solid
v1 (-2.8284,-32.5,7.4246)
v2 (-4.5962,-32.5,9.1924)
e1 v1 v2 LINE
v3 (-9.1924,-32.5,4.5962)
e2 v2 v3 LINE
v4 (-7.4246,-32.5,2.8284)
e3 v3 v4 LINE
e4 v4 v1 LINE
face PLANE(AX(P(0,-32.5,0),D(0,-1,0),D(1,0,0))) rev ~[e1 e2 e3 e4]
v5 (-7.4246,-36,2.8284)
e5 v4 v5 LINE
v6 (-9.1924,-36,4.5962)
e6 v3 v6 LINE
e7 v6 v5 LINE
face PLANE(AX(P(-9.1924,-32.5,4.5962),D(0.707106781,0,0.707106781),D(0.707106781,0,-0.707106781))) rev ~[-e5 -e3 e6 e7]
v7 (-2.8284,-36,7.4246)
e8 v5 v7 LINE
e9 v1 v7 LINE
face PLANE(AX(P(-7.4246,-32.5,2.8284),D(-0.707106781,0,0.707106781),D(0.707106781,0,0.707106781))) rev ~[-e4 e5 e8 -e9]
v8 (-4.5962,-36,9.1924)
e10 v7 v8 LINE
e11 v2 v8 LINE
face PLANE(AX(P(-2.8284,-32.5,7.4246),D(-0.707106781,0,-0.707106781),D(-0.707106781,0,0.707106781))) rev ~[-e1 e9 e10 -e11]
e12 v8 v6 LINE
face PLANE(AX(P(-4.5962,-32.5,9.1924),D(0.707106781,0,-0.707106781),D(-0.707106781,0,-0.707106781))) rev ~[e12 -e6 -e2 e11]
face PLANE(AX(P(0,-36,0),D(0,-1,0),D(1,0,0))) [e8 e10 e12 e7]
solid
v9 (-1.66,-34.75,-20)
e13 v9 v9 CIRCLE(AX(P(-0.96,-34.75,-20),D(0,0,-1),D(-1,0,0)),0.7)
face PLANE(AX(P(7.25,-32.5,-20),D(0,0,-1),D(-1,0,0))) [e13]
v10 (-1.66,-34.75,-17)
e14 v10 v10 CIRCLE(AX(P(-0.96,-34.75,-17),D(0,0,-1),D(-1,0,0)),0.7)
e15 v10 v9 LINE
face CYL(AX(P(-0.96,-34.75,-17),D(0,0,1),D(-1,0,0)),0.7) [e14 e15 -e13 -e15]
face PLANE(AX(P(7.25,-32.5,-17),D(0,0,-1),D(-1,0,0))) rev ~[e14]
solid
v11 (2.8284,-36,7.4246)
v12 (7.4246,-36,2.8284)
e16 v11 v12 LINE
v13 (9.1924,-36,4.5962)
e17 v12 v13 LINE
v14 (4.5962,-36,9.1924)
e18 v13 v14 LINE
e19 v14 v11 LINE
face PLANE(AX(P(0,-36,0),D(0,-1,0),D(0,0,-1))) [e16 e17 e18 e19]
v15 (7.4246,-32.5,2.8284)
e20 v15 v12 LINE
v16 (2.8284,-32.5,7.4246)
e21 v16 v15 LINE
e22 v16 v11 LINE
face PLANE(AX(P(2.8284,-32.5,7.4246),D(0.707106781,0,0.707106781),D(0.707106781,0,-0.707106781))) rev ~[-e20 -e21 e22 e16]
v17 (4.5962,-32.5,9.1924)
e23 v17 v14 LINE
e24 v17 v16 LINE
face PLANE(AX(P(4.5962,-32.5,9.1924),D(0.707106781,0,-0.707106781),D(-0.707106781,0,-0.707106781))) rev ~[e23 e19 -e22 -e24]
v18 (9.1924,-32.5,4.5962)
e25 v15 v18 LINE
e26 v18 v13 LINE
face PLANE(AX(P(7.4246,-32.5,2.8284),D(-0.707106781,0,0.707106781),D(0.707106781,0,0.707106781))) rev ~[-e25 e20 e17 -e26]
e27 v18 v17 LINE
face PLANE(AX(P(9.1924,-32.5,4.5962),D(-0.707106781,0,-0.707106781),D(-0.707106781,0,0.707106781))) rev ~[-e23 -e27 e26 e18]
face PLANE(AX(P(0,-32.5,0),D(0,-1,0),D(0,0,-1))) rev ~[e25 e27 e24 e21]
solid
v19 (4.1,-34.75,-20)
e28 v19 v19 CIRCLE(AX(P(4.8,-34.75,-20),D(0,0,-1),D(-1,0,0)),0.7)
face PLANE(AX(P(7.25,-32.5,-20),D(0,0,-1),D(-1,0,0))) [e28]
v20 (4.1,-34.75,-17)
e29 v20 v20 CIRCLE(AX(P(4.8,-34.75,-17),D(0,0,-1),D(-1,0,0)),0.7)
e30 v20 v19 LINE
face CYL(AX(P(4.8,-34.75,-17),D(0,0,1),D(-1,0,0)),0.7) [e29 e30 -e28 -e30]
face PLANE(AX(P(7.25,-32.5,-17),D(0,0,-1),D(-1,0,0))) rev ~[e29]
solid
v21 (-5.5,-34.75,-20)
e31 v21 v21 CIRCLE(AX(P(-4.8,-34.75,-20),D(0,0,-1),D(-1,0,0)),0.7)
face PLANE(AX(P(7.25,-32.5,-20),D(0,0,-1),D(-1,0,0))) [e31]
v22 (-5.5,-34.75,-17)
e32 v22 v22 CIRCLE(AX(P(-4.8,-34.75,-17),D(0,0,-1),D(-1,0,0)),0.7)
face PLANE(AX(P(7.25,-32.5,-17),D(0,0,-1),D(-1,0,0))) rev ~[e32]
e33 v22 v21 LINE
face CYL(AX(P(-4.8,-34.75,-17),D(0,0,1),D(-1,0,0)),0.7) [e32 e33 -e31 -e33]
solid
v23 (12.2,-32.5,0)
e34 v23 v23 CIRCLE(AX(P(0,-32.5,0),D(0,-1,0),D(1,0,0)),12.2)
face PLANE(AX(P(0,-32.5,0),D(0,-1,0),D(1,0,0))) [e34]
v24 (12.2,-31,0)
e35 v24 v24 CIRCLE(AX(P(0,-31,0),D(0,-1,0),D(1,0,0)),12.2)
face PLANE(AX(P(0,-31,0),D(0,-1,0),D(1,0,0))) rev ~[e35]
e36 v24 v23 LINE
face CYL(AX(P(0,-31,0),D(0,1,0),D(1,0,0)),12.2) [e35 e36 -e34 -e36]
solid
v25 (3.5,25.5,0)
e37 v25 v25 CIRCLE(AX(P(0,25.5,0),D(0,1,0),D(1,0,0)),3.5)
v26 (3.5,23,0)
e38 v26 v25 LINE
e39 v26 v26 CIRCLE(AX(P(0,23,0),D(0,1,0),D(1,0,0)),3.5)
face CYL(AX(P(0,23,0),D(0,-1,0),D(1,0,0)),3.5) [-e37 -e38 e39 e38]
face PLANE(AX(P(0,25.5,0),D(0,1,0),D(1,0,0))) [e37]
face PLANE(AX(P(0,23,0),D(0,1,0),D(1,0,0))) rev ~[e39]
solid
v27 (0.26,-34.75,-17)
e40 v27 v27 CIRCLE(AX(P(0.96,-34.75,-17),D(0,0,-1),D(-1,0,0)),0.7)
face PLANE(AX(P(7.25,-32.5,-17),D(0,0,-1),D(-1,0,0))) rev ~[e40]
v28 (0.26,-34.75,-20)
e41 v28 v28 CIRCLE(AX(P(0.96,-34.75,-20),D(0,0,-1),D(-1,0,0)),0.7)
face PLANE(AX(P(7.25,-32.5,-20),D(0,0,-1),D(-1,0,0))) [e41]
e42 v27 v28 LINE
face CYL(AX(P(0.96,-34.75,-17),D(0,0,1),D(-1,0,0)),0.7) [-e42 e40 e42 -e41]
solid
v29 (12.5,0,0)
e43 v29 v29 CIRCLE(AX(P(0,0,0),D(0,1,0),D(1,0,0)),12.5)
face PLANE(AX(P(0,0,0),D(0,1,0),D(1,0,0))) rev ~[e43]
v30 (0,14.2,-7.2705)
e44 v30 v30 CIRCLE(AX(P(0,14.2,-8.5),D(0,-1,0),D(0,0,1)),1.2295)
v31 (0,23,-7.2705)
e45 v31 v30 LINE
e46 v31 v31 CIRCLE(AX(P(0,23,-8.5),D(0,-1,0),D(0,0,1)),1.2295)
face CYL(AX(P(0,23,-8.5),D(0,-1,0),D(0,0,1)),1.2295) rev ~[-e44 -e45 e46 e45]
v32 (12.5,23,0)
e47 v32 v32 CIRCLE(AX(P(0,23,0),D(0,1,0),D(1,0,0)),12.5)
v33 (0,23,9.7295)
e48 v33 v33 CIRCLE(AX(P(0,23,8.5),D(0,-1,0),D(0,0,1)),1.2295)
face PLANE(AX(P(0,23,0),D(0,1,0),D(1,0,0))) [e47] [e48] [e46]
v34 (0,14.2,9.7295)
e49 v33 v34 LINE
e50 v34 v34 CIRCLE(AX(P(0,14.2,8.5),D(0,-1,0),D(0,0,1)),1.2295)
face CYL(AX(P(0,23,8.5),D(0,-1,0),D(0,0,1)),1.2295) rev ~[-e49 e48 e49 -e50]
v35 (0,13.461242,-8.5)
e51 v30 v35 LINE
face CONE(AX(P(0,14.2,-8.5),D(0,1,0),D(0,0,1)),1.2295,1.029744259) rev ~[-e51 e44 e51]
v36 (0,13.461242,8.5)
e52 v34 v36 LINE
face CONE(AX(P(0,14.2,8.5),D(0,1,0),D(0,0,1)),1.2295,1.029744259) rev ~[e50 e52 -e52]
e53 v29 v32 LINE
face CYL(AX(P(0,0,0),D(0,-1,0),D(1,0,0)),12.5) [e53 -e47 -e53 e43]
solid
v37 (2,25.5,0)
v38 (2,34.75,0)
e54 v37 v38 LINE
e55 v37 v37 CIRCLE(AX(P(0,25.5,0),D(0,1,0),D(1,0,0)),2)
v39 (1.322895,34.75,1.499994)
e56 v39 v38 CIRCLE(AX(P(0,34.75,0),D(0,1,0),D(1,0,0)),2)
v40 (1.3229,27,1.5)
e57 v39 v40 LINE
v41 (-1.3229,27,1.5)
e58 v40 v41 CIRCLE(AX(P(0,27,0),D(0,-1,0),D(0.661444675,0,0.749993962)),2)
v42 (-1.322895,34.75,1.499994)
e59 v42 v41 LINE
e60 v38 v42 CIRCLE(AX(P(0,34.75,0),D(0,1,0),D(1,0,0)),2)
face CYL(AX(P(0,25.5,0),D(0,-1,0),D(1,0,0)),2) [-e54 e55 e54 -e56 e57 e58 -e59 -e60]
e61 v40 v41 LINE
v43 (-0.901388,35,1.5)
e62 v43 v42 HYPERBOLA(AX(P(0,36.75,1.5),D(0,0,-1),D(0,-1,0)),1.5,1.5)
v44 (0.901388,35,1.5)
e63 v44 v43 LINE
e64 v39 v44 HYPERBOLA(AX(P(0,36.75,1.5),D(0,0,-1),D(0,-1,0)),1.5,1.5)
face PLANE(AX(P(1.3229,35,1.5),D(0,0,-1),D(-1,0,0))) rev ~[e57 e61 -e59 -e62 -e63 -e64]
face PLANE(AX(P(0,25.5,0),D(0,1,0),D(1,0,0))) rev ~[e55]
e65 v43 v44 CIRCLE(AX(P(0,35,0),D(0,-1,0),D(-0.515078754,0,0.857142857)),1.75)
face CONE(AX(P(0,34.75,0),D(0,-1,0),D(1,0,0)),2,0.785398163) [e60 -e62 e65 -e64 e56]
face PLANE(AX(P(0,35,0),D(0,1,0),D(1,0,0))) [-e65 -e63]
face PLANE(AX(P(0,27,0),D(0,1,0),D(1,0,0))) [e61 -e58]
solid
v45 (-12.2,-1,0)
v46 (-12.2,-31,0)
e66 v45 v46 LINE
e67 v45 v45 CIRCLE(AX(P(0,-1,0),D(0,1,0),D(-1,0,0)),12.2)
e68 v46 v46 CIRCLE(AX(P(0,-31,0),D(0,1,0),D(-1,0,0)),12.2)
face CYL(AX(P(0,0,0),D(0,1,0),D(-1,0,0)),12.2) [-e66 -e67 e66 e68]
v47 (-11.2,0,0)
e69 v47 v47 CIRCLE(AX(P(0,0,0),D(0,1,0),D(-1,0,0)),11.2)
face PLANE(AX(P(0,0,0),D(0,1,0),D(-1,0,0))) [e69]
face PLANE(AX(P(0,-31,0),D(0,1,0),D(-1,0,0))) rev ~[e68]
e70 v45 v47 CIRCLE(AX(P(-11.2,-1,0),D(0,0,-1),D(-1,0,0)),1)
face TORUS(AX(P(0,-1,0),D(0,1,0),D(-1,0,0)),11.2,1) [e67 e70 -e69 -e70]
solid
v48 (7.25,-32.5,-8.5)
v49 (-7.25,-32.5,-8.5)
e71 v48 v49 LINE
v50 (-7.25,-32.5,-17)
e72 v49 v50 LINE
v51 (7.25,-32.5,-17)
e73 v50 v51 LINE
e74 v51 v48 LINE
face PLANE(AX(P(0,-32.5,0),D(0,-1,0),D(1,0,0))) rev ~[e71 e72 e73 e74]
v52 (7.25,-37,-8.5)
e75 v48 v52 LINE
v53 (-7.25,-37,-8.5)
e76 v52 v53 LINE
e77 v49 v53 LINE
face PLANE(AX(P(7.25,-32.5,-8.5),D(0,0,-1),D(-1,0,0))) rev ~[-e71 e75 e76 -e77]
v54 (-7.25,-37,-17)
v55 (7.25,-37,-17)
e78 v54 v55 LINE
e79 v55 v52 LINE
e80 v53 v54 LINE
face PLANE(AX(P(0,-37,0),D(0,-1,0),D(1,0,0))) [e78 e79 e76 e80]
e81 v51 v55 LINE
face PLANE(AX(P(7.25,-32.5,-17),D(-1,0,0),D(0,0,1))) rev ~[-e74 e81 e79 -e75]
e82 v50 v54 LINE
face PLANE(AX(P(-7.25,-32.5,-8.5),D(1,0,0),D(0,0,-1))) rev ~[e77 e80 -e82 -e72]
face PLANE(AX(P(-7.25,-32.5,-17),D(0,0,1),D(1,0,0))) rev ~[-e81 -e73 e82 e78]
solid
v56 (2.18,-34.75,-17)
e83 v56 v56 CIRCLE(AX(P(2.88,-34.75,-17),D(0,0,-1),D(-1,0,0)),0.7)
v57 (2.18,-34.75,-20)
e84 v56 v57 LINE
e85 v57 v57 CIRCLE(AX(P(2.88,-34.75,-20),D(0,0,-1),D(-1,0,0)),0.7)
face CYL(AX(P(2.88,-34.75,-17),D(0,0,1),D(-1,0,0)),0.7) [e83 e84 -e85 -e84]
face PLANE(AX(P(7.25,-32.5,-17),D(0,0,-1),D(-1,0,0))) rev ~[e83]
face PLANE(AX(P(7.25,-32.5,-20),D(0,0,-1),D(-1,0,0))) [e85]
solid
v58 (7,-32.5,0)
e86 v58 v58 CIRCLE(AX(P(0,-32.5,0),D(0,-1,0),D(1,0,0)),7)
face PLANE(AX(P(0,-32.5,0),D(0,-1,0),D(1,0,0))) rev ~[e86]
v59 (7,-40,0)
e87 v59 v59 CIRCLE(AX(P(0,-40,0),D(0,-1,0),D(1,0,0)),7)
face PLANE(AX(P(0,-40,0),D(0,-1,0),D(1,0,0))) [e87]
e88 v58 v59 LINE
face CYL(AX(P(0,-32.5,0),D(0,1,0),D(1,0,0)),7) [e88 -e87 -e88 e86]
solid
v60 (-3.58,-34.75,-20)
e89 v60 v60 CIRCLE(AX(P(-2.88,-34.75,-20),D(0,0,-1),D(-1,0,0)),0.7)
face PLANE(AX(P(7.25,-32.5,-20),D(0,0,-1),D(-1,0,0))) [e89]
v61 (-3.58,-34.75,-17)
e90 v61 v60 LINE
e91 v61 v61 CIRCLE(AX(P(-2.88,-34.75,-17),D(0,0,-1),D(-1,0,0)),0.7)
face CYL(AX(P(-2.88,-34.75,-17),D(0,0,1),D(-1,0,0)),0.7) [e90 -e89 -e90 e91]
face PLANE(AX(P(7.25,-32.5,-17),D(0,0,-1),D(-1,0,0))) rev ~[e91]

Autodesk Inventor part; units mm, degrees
ref_plane "YZ Plane" through (0, 0, 0) normal (1, 0, 0) x (0, 1, 0)
ref_plane "XZ Plane" through (0, 0, 0) normal (0, 1, 0) x (-1, 0, 0)
ref_plane "XY Plane" through (0, 0, 0) normal (0, 0, 1) x (1, 0, 0)
sketch "Sketch1" plane through (0, 0, 0) normal (0, 1, 0) x (-1, 0, 0)
  circle A0 centre (0, 0) radius 12.2
  dimension "d0" = 24.4
extrude "Extrusion1" add sketch "Sketch1" against normal blind 31
fillet "Fillet1" radius 1 1 edges at (12.2, 0, 0)
sketch "Sketch2" plane through (0, -31, 0) normal (0, -1, 0) x (1, 0, 0)
  circle A0 centre (0, 0) radius 12.2 projected
extrude "Extrusion2" add sketch "Sketch2" along normal blind 1.5 separate body
sketch "Sketch3" plane through (0, -32.5, 0) normal (0, -1, 0) x (1, 0, 0)
  circle A0 centre (0, 0) radius 7
  dimension "d6" = 14
extrude "Extrusion3" add sketch "Sketch3" along normal blind 7.5 separate body
sketch "Sketch4" plane through (0, -32.5, 0) normal (0, -1, 0) x (1, 0, 0)
  circle A0 centre (0, 0) radius 6.75 construction
  line L0 (-7.4246, 2.8284) -> (-2.8284, 7.4246)
  line L1 (-2.8284, 7.4246) -> (-4.5962, 9.1924)
  line L2 (-4.5962, 9.1924) -> (-9.1924, 4.5962)
  line L3 (-9.1924, 4.5962) -> (-7.4246, 2.8284)
  line L4 (-7.4246, 2.8284) -> (-4.5962, 9.1924) construction
  line L5 (-2.8284, 7.4246) -> (-9.1924, 4.5962) construction
  line L6 (0, 0) -> (-6.0104, 6.0104) construction
  line L7 (0, 0) -> (-12.2, 0) construction
  circle A1 centre (0, 0) radius 12.2 construction
  point P0 (4.773, -4.773)
  dimension "d9" = 13.5
  dimension "d10" = 6.5
  dimension "d11" = 2.5
  dimension "d12" = 45
  dimension "d13" = 16.5
extrude "Extrusion4" add sketch "Sketch4" along normal blind 3.5 separate body
pattern_circular "Circular Pattern1" count 2 over 90 about axis through (0, -32.5, 0) along (0, 1, 0) of "Extrusion4" bodies 4
sketch "Sketch5" plane through (0, -32.5, 0) normal (0, -1, 0) x (1, 0, 0)
  line L0 (-7.25, -17) -> (7.25, -17)
  line L1 (7.25, -17) -> (7.25, -8.5)
  line L2 (7.25, -8.5) -> (-7.25, -8.5)
  line L3 (-7.25, -8.5) -> (-7.25, -17)
  line L4 (-7.25, -17) -> (7.25, -8.5) construction
  line L5 (7.25, -17) -> (-7.25, -8.5) construction
  circle A0 centre (0, 0) radius 7 projected
  point P0 (0, -12.75)
  point P1 (0, -12.75)
  dimension "d19" = 17
  dimension "d20" = 8.5
  dimension "d21" = 14.5
extrude "Extrusion5" add sketch "Sketch5" along normal blind 4.5 separate body contours L3 L2 L1 L0
sketch "Sketch6" plane through (7.25, -32.5, -17) normal (0, 0, -1) x (-1, 0, 0)
  line L0 (12.05, -2.25) -> (10.13, -2.25) construction
  line L1 (10.13, -2.25) -> (8.21, -2.25) construction
  line L2 (8.21, -2.25) -> (6.29, -2.25) construction
  line L3 (6.29, -2.25) -> (4.37, -2.25) construction
  line L4 (4.37, -2.25) -> (2.45, -2.25) construction
  circle A0 centre (12.05, -2.25) radius 0.7
  circle A1 centre (10.13, -2.25) radius 0.7
  circle A2 centre (8.21, -2.25) radius 0.7
  circle A3 centre (6.29, -2.25) radius 0.7
  circle A4 centre (4.37, -2.25) radius 0.7
  circle A5 centre (2.45, -2.25) radius 0.7
  line L5 (14.5, 0) -> (14.5, -4.5) projected
  line L6 (14.5, -4.5) -> (0, -4.5) projected
  point P0 (7.25, 32.5)
  point P1 (14.5, -2.25)
  point P2 (7.25, -2.25)
  point P3 (7.25, -4.5)
  dimension "d24" = 9.6
  dimension "d25" = 1.4
extrude "Extrusion6" add sketch "Sketch6" along normal blind 3 separate body contours A0
extrude "Extrusion7" add sketch "Sketch6" along normal blind 3 separate body contours A1
extrude "Extrusion8" add sketch "Sketch6" along normal blind 3 separate body contours A2
extrude "Extrusion9" add sketch "Sketch6" along normal blind 3 separate body contours A3
extrude "Extrusion10" add sketch "Sketch6" along normal blind 3 separate body contours A4
extrude "Extrusion11" add sketch "Sketch6" along normal blind 3 separate body contours A5
sketch "Sketch7" plane through (0, 0, 0) normal (0, 1, 0) x (1, 0, 0)
  circle A0 centre (0, 0) radius 12.5
  dimension "d38" = 25
extrude "Extrusion12" add sketch "Sketch7" along normal blind 23 separate body
sketch "Sketch8" plane through (0, 23, 0) normal (0, 1, 0) x (1, 0, 0)
  circle A0 centre (0, 0) radius 11.2 construction
  circle A1 centre (0, 0) radius 3.5
  dimension "d41" = 7
extrude "Extrusion13" add sketch "Sketch8" along normal blind 2.5 separate body
sketch "Sketch9" plane through (0, 25.5, 0) normal (0, 1, 0) x (1, 0, 0)
  circle A0 centre (0, 0) radius 2
  dimension "d44" = 4
extrude "Extrusion14" add sketch "Sketch9" along normal blind 9.5 separate body
chamfer "Chamfer1" distance 0.25 angle 45 1 edges at (-2, 35, 0)
sketch "Sketch10" plane through (0, 35, 0) normal (0, 1, 0) x (1, 0, 0)
  line L0 (-1.3229, -2) -> (1.3229, -2)
  line L1 (1.3229, -2) -> (1.3229, -1.5)
  line L2 (1.3229, -1.5) -> (-1.3229, -1.5)
  line L3 (-1.3229, -1.5) -> (-1.3229, -2)
  circle A0 centre (0, 0) radius 2 construction
  dimension "d50" = 1.5
extrude "Extrusion15" cut sketch "Sketch10" against normal blind 8 bodies 14
sketch "Sketch11" plane through (0, 23, 0) normal (0, 1, 0) x (1, 0, 0)
  circle A0 centre (0, 0) radius 12.5 construction
  line L0 (0, 8.5) -> (0, -8.5) construction
  line L1 (7.25, 8.5) -> (-7.25, 8.5) construction
  dimension "d53" = 17
hole "Hole1" at (0, 23, -8.5) at (0, 23, 8.5) direction (0, -1, 0) diameter 2.459 depth 8.8 tip angle 118 bodies 12 thread size "M3x0.5" class "6H" standard "ISO Metric profile"
properties part number "Motor 12V com encoder"
